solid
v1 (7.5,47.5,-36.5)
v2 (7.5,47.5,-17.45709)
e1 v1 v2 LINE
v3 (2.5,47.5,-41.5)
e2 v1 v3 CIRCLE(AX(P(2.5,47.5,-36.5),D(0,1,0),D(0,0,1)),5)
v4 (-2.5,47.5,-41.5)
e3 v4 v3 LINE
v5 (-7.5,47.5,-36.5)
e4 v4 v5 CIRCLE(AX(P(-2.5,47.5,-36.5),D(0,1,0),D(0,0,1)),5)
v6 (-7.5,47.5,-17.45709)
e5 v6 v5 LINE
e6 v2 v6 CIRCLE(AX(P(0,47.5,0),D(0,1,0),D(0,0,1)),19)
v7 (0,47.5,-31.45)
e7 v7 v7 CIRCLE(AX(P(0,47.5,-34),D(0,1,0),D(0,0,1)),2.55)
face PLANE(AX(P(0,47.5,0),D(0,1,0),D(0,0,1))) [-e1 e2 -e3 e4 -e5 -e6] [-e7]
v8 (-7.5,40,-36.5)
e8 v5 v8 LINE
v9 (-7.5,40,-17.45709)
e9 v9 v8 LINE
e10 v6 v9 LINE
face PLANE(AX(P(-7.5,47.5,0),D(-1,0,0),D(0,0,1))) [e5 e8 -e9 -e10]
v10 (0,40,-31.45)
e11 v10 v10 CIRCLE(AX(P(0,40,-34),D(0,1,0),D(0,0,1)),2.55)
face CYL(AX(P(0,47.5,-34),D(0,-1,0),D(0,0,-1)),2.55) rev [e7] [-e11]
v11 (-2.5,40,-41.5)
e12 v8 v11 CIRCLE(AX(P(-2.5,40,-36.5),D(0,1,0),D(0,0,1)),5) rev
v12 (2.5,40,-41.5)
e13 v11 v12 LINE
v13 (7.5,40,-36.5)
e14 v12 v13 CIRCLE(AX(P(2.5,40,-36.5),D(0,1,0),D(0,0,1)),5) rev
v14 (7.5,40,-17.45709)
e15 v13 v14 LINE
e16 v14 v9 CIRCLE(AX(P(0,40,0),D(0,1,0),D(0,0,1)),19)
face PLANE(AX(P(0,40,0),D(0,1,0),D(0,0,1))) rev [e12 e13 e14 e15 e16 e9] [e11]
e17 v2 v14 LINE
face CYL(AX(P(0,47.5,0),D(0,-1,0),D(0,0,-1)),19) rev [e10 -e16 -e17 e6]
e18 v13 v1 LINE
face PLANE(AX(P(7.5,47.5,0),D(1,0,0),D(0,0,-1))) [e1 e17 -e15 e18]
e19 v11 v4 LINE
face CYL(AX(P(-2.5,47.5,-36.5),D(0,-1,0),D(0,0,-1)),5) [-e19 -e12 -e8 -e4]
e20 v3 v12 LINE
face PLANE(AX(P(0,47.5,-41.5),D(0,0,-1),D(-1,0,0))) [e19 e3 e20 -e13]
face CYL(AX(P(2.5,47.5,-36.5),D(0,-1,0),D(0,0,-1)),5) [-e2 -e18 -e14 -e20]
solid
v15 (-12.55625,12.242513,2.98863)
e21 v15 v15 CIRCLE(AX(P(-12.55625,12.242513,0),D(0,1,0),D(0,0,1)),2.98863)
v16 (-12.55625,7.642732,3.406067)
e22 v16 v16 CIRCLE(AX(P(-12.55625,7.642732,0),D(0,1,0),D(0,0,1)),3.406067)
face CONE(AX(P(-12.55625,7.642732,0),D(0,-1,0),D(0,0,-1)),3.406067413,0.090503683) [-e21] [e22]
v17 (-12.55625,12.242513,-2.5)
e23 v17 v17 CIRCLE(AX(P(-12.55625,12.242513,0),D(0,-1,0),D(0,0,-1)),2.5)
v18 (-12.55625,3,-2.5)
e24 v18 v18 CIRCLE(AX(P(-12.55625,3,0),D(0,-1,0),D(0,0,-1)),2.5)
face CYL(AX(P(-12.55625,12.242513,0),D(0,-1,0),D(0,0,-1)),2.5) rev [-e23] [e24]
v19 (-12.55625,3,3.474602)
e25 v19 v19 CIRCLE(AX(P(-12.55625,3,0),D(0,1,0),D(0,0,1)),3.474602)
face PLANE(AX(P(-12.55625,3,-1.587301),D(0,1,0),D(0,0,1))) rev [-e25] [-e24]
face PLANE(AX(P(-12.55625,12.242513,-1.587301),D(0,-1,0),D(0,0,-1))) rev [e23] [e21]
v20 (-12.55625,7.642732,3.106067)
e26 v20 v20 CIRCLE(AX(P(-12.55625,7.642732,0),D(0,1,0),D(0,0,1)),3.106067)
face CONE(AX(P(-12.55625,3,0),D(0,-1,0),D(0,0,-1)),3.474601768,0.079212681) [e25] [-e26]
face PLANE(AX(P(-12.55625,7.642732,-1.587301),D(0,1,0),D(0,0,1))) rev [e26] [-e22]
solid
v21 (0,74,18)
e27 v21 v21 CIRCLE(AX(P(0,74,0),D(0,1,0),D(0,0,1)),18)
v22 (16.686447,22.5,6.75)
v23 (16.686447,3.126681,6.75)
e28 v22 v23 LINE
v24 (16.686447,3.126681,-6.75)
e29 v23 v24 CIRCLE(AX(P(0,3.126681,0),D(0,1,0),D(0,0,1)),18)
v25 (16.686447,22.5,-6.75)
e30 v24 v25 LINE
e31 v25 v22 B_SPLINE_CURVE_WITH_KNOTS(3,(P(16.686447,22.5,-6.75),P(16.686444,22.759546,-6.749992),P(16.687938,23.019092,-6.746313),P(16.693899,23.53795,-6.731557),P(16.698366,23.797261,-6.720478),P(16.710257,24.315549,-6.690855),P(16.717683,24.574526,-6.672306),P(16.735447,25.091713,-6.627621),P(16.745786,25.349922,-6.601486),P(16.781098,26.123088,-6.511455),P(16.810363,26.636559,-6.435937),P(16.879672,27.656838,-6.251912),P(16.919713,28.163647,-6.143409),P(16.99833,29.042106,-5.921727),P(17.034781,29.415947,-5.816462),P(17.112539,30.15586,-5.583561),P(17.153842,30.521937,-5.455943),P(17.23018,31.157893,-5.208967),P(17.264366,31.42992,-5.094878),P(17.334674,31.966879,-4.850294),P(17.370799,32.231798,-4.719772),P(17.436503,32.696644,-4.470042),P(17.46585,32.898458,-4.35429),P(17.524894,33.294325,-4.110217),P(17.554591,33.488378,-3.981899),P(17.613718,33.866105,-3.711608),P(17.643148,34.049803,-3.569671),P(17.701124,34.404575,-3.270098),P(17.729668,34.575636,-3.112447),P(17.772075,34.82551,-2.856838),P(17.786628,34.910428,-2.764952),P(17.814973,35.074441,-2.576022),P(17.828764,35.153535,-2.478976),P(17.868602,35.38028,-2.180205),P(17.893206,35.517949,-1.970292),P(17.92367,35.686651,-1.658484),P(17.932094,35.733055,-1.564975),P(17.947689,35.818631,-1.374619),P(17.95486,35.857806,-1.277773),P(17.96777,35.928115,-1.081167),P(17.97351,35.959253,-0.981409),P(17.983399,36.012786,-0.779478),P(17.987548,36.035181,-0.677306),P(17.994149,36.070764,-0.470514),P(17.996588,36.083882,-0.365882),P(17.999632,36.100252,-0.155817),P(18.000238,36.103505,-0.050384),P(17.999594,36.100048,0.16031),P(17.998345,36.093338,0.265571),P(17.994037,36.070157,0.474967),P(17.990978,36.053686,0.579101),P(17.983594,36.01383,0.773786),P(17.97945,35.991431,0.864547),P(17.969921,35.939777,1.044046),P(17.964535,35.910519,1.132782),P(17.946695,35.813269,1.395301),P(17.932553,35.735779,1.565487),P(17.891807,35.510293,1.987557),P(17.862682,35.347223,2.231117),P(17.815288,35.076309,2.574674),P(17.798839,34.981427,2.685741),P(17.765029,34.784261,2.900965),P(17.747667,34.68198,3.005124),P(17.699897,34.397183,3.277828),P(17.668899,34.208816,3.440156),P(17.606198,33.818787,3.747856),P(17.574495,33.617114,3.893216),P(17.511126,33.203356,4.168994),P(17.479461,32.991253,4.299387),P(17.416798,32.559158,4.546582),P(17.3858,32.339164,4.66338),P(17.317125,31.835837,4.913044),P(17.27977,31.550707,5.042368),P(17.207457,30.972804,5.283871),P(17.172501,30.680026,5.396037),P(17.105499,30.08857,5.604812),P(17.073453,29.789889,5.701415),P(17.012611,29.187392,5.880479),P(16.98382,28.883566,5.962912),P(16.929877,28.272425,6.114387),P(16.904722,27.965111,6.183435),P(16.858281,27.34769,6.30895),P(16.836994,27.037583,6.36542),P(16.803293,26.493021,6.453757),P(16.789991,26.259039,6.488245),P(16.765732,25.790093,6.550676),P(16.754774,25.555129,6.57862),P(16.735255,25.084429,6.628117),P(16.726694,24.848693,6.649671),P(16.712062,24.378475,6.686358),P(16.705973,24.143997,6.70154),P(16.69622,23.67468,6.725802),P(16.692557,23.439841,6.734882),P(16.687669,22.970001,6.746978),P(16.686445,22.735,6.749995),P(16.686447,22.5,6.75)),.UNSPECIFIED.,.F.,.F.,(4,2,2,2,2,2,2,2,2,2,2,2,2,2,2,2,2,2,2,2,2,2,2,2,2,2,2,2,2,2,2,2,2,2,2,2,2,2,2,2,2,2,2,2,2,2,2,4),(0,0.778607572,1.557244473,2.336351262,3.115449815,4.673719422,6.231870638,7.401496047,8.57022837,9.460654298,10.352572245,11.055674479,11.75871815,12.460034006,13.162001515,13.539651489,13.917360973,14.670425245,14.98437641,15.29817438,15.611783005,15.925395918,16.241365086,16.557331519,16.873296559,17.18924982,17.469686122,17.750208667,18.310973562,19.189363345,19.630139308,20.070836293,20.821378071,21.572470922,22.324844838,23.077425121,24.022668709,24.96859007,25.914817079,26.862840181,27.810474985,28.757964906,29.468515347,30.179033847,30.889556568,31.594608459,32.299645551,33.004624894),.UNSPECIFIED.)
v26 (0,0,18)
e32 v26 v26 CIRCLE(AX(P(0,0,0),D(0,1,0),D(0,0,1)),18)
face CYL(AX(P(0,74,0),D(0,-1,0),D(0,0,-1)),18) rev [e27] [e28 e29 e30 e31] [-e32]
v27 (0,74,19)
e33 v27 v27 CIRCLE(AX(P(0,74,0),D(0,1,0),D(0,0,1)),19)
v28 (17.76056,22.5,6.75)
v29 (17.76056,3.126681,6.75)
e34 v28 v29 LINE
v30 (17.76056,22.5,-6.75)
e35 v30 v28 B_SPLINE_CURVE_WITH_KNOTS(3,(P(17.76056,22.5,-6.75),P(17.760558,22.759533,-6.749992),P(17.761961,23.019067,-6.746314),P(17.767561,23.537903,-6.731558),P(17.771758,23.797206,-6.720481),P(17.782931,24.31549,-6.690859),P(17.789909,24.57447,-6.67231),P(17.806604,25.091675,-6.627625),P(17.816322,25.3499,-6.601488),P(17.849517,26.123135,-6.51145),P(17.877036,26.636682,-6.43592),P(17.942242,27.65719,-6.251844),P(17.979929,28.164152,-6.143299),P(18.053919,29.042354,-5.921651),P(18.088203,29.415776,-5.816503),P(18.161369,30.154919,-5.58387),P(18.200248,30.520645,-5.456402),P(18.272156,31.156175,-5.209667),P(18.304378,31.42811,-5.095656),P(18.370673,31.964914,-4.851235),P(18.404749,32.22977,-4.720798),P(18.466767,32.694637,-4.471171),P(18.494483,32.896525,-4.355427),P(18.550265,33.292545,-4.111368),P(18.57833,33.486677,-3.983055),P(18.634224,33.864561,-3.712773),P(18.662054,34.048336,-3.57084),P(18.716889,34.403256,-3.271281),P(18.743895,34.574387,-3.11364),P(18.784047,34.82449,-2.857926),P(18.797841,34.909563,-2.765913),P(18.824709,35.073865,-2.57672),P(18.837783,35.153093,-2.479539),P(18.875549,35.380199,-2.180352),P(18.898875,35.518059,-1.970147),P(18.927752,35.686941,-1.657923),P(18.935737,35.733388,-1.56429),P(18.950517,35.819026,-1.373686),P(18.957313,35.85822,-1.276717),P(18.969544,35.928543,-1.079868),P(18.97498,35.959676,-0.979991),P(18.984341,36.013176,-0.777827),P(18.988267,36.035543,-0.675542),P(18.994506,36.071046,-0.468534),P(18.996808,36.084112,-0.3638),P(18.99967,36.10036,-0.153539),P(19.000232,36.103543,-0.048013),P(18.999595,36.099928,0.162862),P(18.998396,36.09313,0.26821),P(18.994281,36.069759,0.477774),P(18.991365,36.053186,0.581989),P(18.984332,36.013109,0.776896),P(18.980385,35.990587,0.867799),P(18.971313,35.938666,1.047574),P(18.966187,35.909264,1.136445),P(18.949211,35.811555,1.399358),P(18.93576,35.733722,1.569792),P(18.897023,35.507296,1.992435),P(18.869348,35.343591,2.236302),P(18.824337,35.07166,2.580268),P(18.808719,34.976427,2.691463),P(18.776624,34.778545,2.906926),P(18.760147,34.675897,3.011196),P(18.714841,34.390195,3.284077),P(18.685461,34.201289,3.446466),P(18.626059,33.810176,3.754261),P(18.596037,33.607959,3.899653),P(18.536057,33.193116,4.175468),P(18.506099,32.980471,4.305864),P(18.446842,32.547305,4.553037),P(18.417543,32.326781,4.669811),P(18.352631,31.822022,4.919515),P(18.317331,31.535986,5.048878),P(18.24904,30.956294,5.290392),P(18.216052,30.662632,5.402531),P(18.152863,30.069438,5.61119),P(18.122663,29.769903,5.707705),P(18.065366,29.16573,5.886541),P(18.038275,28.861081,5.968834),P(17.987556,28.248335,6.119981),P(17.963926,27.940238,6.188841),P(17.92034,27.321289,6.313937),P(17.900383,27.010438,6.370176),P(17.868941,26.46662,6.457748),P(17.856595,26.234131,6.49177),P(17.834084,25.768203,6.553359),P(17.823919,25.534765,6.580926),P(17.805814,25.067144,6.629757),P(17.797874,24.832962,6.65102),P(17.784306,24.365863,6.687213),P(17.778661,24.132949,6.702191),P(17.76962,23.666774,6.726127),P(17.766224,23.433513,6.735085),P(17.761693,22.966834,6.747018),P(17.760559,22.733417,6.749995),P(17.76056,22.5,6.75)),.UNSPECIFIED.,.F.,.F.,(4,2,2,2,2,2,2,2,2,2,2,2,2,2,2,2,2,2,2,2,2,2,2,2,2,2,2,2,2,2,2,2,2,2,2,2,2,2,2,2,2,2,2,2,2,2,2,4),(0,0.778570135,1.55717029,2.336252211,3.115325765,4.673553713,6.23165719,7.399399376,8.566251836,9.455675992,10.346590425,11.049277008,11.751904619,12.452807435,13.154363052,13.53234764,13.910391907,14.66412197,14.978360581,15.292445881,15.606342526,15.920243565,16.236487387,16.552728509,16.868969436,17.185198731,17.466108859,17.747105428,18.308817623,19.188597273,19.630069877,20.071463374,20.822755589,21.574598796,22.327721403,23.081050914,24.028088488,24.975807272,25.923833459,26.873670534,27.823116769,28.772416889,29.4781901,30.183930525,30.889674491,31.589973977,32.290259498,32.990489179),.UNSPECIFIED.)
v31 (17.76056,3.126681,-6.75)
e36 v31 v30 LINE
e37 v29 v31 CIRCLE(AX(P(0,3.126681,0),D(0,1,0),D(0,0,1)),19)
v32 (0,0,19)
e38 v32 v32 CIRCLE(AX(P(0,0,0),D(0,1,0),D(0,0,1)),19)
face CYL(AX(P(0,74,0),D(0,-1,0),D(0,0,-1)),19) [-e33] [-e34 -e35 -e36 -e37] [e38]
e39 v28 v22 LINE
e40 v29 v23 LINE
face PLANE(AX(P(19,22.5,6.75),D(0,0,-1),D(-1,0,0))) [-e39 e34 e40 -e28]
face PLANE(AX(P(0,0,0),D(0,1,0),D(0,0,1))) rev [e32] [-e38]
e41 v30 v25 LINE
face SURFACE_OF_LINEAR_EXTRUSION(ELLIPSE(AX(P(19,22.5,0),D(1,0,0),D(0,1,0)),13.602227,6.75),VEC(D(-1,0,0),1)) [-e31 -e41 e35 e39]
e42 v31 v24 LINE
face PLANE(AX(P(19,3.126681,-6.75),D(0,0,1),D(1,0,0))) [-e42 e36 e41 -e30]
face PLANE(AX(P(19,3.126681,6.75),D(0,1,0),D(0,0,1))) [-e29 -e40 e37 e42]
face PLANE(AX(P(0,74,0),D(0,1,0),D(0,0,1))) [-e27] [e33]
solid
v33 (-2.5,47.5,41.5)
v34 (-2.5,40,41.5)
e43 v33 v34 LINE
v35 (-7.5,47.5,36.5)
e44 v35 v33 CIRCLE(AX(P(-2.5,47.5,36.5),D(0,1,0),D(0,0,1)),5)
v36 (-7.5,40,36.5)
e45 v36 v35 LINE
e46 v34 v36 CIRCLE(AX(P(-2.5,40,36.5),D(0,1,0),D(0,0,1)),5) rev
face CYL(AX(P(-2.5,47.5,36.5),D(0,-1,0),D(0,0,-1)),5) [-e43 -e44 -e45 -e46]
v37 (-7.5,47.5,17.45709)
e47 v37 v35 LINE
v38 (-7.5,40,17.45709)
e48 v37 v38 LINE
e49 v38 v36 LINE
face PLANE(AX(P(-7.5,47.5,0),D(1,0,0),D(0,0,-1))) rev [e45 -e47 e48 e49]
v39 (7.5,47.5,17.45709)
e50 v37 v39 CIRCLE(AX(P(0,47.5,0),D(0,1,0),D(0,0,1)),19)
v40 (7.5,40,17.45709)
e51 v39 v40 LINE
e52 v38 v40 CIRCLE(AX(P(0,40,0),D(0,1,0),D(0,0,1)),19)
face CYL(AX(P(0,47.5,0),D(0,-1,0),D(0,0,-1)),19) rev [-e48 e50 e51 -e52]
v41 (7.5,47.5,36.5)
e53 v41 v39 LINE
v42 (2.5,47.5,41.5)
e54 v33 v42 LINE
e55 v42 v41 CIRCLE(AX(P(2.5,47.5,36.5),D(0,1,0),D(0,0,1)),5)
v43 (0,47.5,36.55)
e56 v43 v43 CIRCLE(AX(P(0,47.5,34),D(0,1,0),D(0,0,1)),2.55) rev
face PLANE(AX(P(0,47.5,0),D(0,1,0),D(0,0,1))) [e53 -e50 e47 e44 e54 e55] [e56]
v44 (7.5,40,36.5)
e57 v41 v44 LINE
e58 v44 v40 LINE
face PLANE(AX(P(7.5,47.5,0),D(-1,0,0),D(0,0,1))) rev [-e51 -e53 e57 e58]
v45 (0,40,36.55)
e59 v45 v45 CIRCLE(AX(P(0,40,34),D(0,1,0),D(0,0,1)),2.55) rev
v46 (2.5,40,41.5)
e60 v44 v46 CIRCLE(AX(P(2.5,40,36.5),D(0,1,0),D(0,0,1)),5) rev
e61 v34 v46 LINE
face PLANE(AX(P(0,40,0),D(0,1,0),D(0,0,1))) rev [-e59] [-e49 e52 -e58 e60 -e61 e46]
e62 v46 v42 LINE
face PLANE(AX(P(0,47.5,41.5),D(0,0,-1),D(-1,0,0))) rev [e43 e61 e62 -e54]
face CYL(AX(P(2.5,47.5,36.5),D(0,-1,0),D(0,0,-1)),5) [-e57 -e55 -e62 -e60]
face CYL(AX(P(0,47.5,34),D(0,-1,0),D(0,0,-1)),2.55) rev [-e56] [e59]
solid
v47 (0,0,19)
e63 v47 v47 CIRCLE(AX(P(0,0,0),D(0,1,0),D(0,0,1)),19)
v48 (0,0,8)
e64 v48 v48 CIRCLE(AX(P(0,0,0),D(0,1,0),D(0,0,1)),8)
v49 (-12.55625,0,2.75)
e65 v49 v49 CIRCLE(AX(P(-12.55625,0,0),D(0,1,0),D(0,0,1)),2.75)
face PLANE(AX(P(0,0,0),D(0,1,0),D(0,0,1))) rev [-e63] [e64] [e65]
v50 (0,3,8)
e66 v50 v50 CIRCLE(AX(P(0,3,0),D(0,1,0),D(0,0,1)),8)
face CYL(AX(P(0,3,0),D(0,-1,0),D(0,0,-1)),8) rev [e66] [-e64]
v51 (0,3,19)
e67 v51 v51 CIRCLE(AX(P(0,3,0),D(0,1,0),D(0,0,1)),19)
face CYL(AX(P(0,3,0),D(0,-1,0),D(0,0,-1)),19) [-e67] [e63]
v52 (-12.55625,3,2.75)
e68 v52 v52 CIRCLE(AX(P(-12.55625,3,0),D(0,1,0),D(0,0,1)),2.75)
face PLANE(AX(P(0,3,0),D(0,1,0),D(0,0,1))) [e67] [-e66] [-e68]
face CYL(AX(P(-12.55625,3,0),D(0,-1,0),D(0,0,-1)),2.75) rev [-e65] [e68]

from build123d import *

# Parameters (mm, degrees)
SKETCH1_R             = 19
SKETCH1_R_2           = 2.75
SKETCH1_R_3           = 8
BOSS_EXTRUDE1_DEPTH   = 3
SKETCH1_5_R           = 19
SKETCH1_5_R_2         = 18
BOSS_EXTRUDE2_DEPTH   = 74
CUT_EXTRUDE1_DEPTH    = 79.727377703
SKETCH3_R             = 2.55
BOSS_EXTRUDE3_DEPTH   = 7.5
BOSS_EXTRUDE3_2_DEPTH = 7.5
BODY_MOVE_COPY1_ANGLE = 90
FILLET3_R             = 5
FILLET4_R             = 5


with BuildPart() as part:
    # Sketch1 → Boss-Extrude1 (new body)
    with BuildSketch(Plane(origin=(0, 0, 0), x_dir=(1, 0, 0), z_dir=(0, 1, 0))):
        with Locations(Location((0, 0, 0), (0, 0, 270))):
            Circle(SKETCH1_R)
        with Locations(Location((-12.55625, 0, 0), (0, 0, 270))):
            Circle(SKETCH1_R_2, mode=Mode.SUBTRACT)
        with Locations(Location((0, 0, 0), (0, 0, 270))):
            Circle(SKETCH1_R_3, mode=Mode.SUBTRACT)
    extrude(amount=BOSS_EXTRUDE1_DEPTH)


with BuildPart() as body_2:
    # Sketch1<5> → Boss-Extrude2 (new body)
    with BuildSketch(Plane(origin=(0, 0, 0), x_dir=(1, 0, 0), z_dir=(0, 1, 0))):
        with Locations(Location((0, 0, 0), (0, 0, 270))):
            Circle(SKETCH1_5_R)
        with Locations(Location((0, 0, 0), (0, 0, 270))):
            Circle(SKETCH1_5_R_2, mode=Mode.SUBTRACT)
    extrude(amount=BOSS_EXTRUDE2_DEPTH)

    # Sketch2 → Cut-Extrude1 (cut, through all)
    with BuildSketch(Plane(origin=(0, 0, 0), x_dir=(0, 0, -1), z_dir=(1, 0, 0))):
        with BuildLine():
            Line((-6.75, 22.5), (-6.75, 3.126681013))
            Line((-6.75, 3.126681013), (6.75, 3.126681013))
            Line((6.75, 3.126681013), (6.75, 22.5))
            add(Edge.make_bspline(
                [(6.75, 22.5), (6.75, 36.102227394), (0, 36.102227394), (-6.75, 36.102227394), (-6.75, 22.5)],
                knots=[4.71238898, 4.71238898, 4.71238898, 6.283185307, 6.283185307, 7.853981634, 7.853981634, 7.853981634], degree=2, weights=[1, 0.707106781, 1, 0.707106781, 1]))
        make_face()
    extrude(amount=CUT_EXTRUDE1_DEPTH, mode=Mode.SUBTRACT)


with BuildPart() as body_3:
    # Sketch3 → Boss-Extrude3 (new body)
    with BuildSketch(Plane(origin=(0, 40, 0), x_dir=(1, 0, 0), z_dir=(0, 1, 0))):
        with BuildLine():
            Line((-7.5, 41.5), (-7.5, 17.45709025))
            ThreePointArc((-7.5, 17.45709025), (0, 19), (7.5, 17.45709025))
            Line((7.5, 17.45709025), (7.5, 41.5))
            Line((7.5, 41.5), (-7.5, 41.5))
        make_face()
        with Locations(Location((0, 34, 0), (0, 0, 270))):
            Circle(SKETCH3_R, mode=Mode.SUBTRACT)
    extrude(amount=BOSS_EXTRUDE3_DEPTH)

    # Fillet4
    fillet4_edges = [body_3.edges().sort_by_distance(p)[0] for p in [
        (-7.5, 43.75, -41.5),
        (7.5, 43.75, -41.5),
    ]]
    fillet(fillet4_edges, radius=FILLET4_R)


with BuildPart() as body_4:
    # Sketch3 → Boss-Extrude3 2 (new body)
    with BuildSketch(Plane(origin=(0, 40, 0), x_dir=(1, 0, 0), z_dir=(0, 1, 0))):
        with BuildLine():
            ThreePointArc((7.5, -17.45709025), (0, -19), (-7.5, -17.45709025))
            Line((-7.5, -17.45709025), (-7.5, -41.5))
            Line((-7.5, -41.5), (7.5, -41.5))
            Line((7.5, -41.5), (7.5, -17.45709025))
        make_face()
        with Locations(Location((0, -34, 0), (0, 0, 270))):
            Circle(SKETCH3_R, mode=Mode.SUBTRACT)
    extrude(amount=BOSS_EXTRUDE3_2_DEPTH)

    # Fillet3
    fillet3_edges = [body_4.edges().sort_by_distance(p)[0] for p in [
        (7.5, 43.75, 41.5),
        (-7.5, 43.75, 41.5),
    ]]
    fillet(fillet3_edges, radius=FILLET3_R)


with BuildPart() as body_5:
    # barbfitting_mcmaster5218K688_V6: read off the stored shape, not the designer's step
    # barbfitting_mcmaster5218K688_V6 outline → barbfitting_mcmaster5218K688_V6 (revolve)
    with BuildSketch(Plane(origin=(-6.358056722, 31.008138883, 0), x_dir=(1, 0, 0), z_dir=(0, -1, 0))):
        Polygon((2.988629913, 1.192484738), (2.5, 1.192484738), (2.5, -8.050028229), (3.474601768, -8.050028229), (3.106067413, -3.407296512), (3.406067413, -3.407296512), align=None)
    revolve(axis=Axis((-6.358056722, 31.008138883, 0), (0, 0, 1)))


with BuildPart() as body_5_1:
    # Body-Move/Copy1: moved
    add(body_5.part.rotate(Axis((0, 31.008138883, -3.428771746), (-1, 0, 0)), BODY_MOVE_COPY1_ANGLE))


with BuildPart() as body_5_2:
    # Body-Move/Copy2: read off the stored shape, not the designer's step
    # Body-Move/Copy2: moved
    add(body_5_1.part.moved(Location((-6.1981933, -23.3868824, 3.4287717))))


solid = Compound([part.part, body_2.part, body_3.part, body_4.part, body_5_2.part])
